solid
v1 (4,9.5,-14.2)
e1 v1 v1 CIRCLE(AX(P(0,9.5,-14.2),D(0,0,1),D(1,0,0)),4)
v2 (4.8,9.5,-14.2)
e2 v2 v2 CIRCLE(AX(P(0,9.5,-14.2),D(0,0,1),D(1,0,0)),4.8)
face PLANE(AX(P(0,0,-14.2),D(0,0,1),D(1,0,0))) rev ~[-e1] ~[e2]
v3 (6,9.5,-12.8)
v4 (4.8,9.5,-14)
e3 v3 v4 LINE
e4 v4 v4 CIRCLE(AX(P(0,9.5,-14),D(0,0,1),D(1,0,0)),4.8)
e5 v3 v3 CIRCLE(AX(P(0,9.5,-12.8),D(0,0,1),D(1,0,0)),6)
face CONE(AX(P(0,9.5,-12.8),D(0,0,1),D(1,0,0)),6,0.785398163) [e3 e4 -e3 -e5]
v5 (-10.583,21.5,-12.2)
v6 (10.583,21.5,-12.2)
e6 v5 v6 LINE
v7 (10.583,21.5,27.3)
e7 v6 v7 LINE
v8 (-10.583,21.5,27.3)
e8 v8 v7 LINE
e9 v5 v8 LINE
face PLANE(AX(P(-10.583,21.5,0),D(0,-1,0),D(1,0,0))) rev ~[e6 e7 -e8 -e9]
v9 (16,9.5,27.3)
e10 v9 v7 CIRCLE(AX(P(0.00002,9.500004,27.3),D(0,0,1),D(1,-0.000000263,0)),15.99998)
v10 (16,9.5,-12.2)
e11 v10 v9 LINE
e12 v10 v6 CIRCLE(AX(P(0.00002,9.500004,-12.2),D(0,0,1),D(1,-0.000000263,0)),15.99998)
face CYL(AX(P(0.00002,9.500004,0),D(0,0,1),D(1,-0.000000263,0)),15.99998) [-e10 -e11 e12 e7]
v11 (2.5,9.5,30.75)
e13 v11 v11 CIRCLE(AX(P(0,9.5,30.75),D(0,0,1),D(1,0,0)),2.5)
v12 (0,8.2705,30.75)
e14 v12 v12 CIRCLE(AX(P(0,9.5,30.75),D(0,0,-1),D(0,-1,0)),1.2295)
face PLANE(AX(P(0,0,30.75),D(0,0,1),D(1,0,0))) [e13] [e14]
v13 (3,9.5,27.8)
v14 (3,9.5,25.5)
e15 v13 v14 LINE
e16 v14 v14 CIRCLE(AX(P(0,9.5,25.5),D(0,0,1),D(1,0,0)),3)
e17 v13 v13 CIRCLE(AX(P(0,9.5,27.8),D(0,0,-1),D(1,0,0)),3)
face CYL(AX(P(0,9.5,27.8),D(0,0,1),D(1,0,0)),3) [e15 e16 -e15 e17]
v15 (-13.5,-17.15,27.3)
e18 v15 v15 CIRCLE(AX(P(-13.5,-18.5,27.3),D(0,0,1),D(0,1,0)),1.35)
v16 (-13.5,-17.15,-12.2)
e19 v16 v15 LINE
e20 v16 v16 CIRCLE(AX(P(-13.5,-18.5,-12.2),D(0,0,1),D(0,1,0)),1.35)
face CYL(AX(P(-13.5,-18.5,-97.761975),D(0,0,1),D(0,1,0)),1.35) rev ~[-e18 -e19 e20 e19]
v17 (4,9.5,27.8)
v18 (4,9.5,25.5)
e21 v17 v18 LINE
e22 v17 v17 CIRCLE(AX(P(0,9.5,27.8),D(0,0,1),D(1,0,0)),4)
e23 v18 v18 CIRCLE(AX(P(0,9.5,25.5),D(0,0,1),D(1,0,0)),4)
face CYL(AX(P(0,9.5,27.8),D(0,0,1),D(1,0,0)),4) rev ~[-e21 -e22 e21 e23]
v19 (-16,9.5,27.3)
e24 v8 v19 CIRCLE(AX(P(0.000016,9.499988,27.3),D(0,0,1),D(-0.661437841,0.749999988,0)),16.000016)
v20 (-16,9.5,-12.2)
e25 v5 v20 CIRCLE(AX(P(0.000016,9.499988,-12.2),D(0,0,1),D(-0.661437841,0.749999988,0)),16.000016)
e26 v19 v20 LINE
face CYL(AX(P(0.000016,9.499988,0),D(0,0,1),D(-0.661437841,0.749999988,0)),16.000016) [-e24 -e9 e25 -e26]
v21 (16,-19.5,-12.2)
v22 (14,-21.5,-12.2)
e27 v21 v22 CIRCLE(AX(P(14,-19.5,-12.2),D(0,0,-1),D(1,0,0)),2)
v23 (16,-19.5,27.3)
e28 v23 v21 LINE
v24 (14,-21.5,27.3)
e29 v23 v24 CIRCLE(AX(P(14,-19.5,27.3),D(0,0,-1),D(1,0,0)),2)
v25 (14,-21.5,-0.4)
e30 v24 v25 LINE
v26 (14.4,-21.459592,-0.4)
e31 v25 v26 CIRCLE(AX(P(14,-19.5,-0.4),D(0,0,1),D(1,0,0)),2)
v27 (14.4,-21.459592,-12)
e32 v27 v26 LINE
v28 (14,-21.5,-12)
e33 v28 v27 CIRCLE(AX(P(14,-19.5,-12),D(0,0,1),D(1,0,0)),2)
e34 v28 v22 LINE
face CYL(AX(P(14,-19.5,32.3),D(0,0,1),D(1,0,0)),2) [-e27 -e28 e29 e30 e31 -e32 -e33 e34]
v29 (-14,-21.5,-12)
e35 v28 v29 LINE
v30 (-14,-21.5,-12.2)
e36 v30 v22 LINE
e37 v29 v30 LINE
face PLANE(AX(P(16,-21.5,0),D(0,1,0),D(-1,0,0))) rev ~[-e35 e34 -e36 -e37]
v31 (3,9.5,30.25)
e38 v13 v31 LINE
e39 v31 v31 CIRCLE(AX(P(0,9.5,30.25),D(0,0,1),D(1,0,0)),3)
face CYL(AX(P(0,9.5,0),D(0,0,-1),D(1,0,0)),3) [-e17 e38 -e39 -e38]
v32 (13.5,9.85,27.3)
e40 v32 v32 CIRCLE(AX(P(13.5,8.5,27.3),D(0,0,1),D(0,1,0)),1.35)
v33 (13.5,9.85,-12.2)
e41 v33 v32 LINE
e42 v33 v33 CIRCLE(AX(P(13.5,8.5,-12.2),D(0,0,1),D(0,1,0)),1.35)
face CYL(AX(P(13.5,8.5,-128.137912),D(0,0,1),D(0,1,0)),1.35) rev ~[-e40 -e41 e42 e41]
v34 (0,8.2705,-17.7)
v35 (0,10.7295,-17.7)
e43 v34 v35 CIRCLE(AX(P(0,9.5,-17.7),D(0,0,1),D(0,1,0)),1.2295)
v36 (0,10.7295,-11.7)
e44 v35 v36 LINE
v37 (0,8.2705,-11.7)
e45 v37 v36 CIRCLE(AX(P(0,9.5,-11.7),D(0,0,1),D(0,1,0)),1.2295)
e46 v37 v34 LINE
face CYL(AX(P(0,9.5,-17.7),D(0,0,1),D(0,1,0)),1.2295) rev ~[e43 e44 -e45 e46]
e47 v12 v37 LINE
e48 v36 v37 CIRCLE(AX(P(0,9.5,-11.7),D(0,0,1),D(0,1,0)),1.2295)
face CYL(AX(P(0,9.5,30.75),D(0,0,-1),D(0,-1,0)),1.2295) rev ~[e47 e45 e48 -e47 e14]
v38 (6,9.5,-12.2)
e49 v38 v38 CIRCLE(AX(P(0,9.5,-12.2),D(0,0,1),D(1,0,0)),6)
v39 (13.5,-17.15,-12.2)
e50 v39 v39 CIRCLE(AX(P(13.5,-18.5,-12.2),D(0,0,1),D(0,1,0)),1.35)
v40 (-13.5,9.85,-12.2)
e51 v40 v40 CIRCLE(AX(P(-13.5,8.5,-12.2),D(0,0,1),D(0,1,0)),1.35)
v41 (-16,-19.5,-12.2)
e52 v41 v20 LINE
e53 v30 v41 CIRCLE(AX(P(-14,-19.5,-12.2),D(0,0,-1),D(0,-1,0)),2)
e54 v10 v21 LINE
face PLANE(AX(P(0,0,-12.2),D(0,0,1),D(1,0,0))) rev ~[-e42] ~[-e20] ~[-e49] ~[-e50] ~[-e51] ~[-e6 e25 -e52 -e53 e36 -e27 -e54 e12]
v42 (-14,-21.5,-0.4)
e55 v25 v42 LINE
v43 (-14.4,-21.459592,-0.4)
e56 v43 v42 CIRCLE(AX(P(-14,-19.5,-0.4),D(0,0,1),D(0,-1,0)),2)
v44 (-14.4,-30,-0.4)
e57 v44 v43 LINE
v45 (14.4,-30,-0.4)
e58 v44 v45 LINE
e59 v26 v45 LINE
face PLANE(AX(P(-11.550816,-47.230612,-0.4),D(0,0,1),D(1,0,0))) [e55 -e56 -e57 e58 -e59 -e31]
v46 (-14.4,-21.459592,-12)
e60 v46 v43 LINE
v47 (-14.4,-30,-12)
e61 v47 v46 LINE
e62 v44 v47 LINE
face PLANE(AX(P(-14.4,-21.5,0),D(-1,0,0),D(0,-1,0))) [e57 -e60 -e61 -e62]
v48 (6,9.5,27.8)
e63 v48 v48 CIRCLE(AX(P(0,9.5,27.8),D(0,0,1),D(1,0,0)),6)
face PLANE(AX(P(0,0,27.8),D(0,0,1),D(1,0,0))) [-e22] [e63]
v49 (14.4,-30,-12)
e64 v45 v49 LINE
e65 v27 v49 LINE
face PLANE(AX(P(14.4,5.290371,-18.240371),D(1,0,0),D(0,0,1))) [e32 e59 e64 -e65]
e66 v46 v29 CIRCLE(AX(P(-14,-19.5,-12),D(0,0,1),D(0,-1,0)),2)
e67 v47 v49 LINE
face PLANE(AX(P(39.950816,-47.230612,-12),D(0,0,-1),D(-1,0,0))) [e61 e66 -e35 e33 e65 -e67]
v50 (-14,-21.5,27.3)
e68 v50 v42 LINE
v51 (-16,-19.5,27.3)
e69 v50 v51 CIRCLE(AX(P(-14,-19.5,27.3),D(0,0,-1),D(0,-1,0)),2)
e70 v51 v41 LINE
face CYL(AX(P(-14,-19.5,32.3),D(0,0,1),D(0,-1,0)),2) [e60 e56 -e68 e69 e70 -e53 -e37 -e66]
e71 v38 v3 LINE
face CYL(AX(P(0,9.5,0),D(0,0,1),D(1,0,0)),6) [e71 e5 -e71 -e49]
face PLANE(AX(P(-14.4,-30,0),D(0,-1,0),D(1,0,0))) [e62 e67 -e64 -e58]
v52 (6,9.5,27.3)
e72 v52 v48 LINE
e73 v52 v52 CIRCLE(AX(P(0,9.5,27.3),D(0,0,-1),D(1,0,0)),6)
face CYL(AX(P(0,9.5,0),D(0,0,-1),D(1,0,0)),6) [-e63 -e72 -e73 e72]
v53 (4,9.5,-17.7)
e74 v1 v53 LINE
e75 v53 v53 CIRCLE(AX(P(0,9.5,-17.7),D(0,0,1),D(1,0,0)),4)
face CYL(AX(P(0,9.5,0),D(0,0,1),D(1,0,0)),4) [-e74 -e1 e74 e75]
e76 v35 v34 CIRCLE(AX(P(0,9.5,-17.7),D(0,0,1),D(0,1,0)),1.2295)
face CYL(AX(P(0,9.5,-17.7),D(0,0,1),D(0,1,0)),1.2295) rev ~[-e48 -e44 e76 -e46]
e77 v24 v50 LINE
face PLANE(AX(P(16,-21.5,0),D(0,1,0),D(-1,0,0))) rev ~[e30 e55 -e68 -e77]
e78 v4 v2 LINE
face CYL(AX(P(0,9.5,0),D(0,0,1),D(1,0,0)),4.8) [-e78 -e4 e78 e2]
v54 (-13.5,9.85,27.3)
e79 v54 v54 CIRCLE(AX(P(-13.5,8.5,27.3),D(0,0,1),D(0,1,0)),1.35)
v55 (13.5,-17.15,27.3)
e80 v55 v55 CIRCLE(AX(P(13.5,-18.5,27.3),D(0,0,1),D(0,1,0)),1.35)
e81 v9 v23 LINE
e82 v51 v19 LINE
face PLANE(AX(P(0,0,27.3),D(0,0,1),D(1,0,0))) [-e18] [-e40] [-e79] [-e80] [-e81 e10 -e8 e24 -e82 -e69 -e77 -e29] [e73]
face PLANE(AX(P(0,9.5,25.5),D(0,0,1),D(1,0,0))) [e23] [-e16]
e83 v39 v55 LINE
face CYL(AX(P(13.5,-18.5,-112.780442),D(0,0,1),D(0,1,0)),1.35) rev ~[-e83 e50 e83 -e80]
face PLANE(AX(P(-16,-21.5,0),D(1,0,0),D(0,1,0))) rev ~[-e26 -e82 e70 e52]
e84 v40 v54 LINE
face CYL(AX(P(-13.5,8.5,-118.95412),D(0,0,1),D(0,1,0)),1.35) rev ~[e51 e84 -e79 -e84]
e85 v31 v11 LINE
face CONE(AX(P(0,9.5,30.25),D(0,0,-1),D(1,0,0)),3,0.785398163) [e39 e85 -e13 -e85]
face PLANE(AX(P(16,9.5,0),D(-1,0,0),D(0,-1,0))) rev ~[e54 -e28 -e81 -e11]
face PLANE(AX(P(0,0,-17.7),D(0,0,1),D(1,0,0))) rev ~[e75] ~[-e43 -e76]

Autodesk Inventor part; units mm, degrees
ref_plane "YZ Plane" through (0, 0, 0) normal (1, 0, 0) x (0, 1, 0)
ref_plane "XZ Plane" through (0, 0, 0) normal (0, 1, 0) x (-1, 0, 0)
ref_plane "XY Plane" through (0, 0, 0) normal (0, 0, 1) x (1, 0, 0)
sketch "スケッチ1" plane through (0, 0, 0) normal (0, 0, 1) x (1, 0, 0)
  line L0 (-16, 21.5) -> (-10.583, 21.5) construction
  line L1 (16, 21.5) -> (16, 9.5) construction
  line L2 (16, -21.5) -> (-16, -21.5)
  line L3 (-16, -21.5) -> (-16, 9.5)
  line L4 (-16, 21.5) -> (16, -21.5) construction
  line L5 (16, 21.5) -> (-16, -21.5) construction
  line L6 (-14.4, -21.5) -> (-14.4, -30)
  line L7 (-14.4, -30) -> (14.4, -30)
  line L8 (0, 21.5) -> (0, -21.5) construction
  line L9 (14.4, -21.5) -> (14.4, -30)
  line L10 (-13.5, 21.5) -> (-13.5, -21.5) construction
  circle A0 centre (0, 9.5) radius 6
  circle A1 centre (0, 9.5) radius 4
  arc A2 (-10.583, 21.5) -> (-16, 9.5) centre (0, 9.5) ccw
  arc A3 (16, 9.5) -> (10.583, 21.5) centre (0, 9.5) ccw
  line L11 (-10.583, 21.5) -> (10.583, 21.5)
  line L12 (-16, 9.5) -> (-16, 21.5) construction
  line L13 (10.583, 21.5) -> (16, 21.5) construction
  line L14 (16, 9.5) -> (16, -21.5)
  circle A4 centre (0, 9.5) radius 3
  circle A5 centre (0, 9.5) radius 4.8
  point P0 (0, 0)
  point P1 (-13.5, 8.5)
  point P2 (-13.5, -18.5)
  point P3 (13.5, 8.5)
  point P4 (13.5, -18.5)
  dimension "d0" = 32
  dimension "d1" = 43
  dimension "d4" = 28.8
  dimension "d5" = 8.5
  dimension "d8" = 27
  dimension "d9" = 8.5
  dimension "d12" = 18.5
  dimension "d13" = 12
  dimension "d14" = 8
  dimension "d15" = 9.5
  dimension "d17" = 16
  dimension "d32" = 13.5
  dimension "d47" = 6
  dimension "d67" = 9.6
extrude "押し出し1" add sketch "スケッチ1" against normal blind 12.2 contours L2 L3 A2 L11 A3 L14 | A0 | A1 | A4 | A5
extrude "押し出し2" add sketch "スケッチ1" against normal blind 12 contours L9 L7 L6 L2
extrude "押し出し3" add sketch "スケッチ1" against normal blind 14 contours A0 | A1 | A4 | A5
extrude "押し出し4" add sketch "スケッチ1" against normal blind 17.7 contours A1 | A4
chamfer "面取り1" distance 1.2 angle 45 1 edges at (-6, 9.5, -14)
sketch "スケッチ2" plane through (0, 9.5, -17.7) normal (0, 0, -1) x (-1, 0, 0)
  circle A0 centre (0, 0) radius 4 projected
  point P0 (0, -9.5)
hole "穴1" at (0, 9.5, -17.7) direction (0, 0, 1) diameter 2.459 depth 6 thread size "M3x0.5" class "6H" standard "ANSI Metric M Profile"
extrude "押し出し5" add sketch "スケッチ1" along normal blind 27.3 contours L2 L3 A2 L11 A3 L14 | A0 | A1 | A4 | A5
hole "穴2" at (-13.5, 8.5, 0) at (-13.5, -18.5, 0) at (13.5, 8.5, 0) at (13.5, -18.5, 0) direction (0, 0, 1) diameter 2.7 end through all both
extrude "押し出し6" cut sketch "スケッチ1" against normal blind 0.4 contours L9 L7 L6 L2
fillet "フィレット1" radius 2 2 edges at (16, -21.5, 7.55) (-16, -21.5, 7.55)
extrude "押し出し7" add sketch "スケッチ1" along normal blind 27.8 contours A0 | A1 | A4 | A5
extrude "押し出し8" add sketch "スケッチ1" along normal blind 30.75 contours A4
sketch "スケッチ3" plane through (0, 9.5, 30.75) normal (0, 0, 1) x (1, 0, 0)
  circle A0 centre (0, 0) radius 1.2295 projected
  point P0 (0, -9.5)
hole "穴3" at (0, 9.5, 30.75) direction (0, 0, -1) diameter 2.459 end through all thread size "M3x0.5" class "6H" standard "ANSI Metric M Profile"
sketch "スケッチ4" plane through (0, 9.5, 27.8) normal (0, 0, 1) x (1, 0, 0)
  circle A0 centre (0, 0) radius 4
  circle A1 centre (0, 0) radius 3
  point P0 (0, -9.5)
extrude "押し出し9" cut sketch "スケッチ4" against normal blind 2.3
chamfer "面取り2" distance 0.5 angle 45 1 edges at (-3, 9.5, 30.75)
extrude "押し出し10" add sketch "スケッチ1" against normal blind 14.2 contours A5
properties part number "B3M-SC-1170-A"
